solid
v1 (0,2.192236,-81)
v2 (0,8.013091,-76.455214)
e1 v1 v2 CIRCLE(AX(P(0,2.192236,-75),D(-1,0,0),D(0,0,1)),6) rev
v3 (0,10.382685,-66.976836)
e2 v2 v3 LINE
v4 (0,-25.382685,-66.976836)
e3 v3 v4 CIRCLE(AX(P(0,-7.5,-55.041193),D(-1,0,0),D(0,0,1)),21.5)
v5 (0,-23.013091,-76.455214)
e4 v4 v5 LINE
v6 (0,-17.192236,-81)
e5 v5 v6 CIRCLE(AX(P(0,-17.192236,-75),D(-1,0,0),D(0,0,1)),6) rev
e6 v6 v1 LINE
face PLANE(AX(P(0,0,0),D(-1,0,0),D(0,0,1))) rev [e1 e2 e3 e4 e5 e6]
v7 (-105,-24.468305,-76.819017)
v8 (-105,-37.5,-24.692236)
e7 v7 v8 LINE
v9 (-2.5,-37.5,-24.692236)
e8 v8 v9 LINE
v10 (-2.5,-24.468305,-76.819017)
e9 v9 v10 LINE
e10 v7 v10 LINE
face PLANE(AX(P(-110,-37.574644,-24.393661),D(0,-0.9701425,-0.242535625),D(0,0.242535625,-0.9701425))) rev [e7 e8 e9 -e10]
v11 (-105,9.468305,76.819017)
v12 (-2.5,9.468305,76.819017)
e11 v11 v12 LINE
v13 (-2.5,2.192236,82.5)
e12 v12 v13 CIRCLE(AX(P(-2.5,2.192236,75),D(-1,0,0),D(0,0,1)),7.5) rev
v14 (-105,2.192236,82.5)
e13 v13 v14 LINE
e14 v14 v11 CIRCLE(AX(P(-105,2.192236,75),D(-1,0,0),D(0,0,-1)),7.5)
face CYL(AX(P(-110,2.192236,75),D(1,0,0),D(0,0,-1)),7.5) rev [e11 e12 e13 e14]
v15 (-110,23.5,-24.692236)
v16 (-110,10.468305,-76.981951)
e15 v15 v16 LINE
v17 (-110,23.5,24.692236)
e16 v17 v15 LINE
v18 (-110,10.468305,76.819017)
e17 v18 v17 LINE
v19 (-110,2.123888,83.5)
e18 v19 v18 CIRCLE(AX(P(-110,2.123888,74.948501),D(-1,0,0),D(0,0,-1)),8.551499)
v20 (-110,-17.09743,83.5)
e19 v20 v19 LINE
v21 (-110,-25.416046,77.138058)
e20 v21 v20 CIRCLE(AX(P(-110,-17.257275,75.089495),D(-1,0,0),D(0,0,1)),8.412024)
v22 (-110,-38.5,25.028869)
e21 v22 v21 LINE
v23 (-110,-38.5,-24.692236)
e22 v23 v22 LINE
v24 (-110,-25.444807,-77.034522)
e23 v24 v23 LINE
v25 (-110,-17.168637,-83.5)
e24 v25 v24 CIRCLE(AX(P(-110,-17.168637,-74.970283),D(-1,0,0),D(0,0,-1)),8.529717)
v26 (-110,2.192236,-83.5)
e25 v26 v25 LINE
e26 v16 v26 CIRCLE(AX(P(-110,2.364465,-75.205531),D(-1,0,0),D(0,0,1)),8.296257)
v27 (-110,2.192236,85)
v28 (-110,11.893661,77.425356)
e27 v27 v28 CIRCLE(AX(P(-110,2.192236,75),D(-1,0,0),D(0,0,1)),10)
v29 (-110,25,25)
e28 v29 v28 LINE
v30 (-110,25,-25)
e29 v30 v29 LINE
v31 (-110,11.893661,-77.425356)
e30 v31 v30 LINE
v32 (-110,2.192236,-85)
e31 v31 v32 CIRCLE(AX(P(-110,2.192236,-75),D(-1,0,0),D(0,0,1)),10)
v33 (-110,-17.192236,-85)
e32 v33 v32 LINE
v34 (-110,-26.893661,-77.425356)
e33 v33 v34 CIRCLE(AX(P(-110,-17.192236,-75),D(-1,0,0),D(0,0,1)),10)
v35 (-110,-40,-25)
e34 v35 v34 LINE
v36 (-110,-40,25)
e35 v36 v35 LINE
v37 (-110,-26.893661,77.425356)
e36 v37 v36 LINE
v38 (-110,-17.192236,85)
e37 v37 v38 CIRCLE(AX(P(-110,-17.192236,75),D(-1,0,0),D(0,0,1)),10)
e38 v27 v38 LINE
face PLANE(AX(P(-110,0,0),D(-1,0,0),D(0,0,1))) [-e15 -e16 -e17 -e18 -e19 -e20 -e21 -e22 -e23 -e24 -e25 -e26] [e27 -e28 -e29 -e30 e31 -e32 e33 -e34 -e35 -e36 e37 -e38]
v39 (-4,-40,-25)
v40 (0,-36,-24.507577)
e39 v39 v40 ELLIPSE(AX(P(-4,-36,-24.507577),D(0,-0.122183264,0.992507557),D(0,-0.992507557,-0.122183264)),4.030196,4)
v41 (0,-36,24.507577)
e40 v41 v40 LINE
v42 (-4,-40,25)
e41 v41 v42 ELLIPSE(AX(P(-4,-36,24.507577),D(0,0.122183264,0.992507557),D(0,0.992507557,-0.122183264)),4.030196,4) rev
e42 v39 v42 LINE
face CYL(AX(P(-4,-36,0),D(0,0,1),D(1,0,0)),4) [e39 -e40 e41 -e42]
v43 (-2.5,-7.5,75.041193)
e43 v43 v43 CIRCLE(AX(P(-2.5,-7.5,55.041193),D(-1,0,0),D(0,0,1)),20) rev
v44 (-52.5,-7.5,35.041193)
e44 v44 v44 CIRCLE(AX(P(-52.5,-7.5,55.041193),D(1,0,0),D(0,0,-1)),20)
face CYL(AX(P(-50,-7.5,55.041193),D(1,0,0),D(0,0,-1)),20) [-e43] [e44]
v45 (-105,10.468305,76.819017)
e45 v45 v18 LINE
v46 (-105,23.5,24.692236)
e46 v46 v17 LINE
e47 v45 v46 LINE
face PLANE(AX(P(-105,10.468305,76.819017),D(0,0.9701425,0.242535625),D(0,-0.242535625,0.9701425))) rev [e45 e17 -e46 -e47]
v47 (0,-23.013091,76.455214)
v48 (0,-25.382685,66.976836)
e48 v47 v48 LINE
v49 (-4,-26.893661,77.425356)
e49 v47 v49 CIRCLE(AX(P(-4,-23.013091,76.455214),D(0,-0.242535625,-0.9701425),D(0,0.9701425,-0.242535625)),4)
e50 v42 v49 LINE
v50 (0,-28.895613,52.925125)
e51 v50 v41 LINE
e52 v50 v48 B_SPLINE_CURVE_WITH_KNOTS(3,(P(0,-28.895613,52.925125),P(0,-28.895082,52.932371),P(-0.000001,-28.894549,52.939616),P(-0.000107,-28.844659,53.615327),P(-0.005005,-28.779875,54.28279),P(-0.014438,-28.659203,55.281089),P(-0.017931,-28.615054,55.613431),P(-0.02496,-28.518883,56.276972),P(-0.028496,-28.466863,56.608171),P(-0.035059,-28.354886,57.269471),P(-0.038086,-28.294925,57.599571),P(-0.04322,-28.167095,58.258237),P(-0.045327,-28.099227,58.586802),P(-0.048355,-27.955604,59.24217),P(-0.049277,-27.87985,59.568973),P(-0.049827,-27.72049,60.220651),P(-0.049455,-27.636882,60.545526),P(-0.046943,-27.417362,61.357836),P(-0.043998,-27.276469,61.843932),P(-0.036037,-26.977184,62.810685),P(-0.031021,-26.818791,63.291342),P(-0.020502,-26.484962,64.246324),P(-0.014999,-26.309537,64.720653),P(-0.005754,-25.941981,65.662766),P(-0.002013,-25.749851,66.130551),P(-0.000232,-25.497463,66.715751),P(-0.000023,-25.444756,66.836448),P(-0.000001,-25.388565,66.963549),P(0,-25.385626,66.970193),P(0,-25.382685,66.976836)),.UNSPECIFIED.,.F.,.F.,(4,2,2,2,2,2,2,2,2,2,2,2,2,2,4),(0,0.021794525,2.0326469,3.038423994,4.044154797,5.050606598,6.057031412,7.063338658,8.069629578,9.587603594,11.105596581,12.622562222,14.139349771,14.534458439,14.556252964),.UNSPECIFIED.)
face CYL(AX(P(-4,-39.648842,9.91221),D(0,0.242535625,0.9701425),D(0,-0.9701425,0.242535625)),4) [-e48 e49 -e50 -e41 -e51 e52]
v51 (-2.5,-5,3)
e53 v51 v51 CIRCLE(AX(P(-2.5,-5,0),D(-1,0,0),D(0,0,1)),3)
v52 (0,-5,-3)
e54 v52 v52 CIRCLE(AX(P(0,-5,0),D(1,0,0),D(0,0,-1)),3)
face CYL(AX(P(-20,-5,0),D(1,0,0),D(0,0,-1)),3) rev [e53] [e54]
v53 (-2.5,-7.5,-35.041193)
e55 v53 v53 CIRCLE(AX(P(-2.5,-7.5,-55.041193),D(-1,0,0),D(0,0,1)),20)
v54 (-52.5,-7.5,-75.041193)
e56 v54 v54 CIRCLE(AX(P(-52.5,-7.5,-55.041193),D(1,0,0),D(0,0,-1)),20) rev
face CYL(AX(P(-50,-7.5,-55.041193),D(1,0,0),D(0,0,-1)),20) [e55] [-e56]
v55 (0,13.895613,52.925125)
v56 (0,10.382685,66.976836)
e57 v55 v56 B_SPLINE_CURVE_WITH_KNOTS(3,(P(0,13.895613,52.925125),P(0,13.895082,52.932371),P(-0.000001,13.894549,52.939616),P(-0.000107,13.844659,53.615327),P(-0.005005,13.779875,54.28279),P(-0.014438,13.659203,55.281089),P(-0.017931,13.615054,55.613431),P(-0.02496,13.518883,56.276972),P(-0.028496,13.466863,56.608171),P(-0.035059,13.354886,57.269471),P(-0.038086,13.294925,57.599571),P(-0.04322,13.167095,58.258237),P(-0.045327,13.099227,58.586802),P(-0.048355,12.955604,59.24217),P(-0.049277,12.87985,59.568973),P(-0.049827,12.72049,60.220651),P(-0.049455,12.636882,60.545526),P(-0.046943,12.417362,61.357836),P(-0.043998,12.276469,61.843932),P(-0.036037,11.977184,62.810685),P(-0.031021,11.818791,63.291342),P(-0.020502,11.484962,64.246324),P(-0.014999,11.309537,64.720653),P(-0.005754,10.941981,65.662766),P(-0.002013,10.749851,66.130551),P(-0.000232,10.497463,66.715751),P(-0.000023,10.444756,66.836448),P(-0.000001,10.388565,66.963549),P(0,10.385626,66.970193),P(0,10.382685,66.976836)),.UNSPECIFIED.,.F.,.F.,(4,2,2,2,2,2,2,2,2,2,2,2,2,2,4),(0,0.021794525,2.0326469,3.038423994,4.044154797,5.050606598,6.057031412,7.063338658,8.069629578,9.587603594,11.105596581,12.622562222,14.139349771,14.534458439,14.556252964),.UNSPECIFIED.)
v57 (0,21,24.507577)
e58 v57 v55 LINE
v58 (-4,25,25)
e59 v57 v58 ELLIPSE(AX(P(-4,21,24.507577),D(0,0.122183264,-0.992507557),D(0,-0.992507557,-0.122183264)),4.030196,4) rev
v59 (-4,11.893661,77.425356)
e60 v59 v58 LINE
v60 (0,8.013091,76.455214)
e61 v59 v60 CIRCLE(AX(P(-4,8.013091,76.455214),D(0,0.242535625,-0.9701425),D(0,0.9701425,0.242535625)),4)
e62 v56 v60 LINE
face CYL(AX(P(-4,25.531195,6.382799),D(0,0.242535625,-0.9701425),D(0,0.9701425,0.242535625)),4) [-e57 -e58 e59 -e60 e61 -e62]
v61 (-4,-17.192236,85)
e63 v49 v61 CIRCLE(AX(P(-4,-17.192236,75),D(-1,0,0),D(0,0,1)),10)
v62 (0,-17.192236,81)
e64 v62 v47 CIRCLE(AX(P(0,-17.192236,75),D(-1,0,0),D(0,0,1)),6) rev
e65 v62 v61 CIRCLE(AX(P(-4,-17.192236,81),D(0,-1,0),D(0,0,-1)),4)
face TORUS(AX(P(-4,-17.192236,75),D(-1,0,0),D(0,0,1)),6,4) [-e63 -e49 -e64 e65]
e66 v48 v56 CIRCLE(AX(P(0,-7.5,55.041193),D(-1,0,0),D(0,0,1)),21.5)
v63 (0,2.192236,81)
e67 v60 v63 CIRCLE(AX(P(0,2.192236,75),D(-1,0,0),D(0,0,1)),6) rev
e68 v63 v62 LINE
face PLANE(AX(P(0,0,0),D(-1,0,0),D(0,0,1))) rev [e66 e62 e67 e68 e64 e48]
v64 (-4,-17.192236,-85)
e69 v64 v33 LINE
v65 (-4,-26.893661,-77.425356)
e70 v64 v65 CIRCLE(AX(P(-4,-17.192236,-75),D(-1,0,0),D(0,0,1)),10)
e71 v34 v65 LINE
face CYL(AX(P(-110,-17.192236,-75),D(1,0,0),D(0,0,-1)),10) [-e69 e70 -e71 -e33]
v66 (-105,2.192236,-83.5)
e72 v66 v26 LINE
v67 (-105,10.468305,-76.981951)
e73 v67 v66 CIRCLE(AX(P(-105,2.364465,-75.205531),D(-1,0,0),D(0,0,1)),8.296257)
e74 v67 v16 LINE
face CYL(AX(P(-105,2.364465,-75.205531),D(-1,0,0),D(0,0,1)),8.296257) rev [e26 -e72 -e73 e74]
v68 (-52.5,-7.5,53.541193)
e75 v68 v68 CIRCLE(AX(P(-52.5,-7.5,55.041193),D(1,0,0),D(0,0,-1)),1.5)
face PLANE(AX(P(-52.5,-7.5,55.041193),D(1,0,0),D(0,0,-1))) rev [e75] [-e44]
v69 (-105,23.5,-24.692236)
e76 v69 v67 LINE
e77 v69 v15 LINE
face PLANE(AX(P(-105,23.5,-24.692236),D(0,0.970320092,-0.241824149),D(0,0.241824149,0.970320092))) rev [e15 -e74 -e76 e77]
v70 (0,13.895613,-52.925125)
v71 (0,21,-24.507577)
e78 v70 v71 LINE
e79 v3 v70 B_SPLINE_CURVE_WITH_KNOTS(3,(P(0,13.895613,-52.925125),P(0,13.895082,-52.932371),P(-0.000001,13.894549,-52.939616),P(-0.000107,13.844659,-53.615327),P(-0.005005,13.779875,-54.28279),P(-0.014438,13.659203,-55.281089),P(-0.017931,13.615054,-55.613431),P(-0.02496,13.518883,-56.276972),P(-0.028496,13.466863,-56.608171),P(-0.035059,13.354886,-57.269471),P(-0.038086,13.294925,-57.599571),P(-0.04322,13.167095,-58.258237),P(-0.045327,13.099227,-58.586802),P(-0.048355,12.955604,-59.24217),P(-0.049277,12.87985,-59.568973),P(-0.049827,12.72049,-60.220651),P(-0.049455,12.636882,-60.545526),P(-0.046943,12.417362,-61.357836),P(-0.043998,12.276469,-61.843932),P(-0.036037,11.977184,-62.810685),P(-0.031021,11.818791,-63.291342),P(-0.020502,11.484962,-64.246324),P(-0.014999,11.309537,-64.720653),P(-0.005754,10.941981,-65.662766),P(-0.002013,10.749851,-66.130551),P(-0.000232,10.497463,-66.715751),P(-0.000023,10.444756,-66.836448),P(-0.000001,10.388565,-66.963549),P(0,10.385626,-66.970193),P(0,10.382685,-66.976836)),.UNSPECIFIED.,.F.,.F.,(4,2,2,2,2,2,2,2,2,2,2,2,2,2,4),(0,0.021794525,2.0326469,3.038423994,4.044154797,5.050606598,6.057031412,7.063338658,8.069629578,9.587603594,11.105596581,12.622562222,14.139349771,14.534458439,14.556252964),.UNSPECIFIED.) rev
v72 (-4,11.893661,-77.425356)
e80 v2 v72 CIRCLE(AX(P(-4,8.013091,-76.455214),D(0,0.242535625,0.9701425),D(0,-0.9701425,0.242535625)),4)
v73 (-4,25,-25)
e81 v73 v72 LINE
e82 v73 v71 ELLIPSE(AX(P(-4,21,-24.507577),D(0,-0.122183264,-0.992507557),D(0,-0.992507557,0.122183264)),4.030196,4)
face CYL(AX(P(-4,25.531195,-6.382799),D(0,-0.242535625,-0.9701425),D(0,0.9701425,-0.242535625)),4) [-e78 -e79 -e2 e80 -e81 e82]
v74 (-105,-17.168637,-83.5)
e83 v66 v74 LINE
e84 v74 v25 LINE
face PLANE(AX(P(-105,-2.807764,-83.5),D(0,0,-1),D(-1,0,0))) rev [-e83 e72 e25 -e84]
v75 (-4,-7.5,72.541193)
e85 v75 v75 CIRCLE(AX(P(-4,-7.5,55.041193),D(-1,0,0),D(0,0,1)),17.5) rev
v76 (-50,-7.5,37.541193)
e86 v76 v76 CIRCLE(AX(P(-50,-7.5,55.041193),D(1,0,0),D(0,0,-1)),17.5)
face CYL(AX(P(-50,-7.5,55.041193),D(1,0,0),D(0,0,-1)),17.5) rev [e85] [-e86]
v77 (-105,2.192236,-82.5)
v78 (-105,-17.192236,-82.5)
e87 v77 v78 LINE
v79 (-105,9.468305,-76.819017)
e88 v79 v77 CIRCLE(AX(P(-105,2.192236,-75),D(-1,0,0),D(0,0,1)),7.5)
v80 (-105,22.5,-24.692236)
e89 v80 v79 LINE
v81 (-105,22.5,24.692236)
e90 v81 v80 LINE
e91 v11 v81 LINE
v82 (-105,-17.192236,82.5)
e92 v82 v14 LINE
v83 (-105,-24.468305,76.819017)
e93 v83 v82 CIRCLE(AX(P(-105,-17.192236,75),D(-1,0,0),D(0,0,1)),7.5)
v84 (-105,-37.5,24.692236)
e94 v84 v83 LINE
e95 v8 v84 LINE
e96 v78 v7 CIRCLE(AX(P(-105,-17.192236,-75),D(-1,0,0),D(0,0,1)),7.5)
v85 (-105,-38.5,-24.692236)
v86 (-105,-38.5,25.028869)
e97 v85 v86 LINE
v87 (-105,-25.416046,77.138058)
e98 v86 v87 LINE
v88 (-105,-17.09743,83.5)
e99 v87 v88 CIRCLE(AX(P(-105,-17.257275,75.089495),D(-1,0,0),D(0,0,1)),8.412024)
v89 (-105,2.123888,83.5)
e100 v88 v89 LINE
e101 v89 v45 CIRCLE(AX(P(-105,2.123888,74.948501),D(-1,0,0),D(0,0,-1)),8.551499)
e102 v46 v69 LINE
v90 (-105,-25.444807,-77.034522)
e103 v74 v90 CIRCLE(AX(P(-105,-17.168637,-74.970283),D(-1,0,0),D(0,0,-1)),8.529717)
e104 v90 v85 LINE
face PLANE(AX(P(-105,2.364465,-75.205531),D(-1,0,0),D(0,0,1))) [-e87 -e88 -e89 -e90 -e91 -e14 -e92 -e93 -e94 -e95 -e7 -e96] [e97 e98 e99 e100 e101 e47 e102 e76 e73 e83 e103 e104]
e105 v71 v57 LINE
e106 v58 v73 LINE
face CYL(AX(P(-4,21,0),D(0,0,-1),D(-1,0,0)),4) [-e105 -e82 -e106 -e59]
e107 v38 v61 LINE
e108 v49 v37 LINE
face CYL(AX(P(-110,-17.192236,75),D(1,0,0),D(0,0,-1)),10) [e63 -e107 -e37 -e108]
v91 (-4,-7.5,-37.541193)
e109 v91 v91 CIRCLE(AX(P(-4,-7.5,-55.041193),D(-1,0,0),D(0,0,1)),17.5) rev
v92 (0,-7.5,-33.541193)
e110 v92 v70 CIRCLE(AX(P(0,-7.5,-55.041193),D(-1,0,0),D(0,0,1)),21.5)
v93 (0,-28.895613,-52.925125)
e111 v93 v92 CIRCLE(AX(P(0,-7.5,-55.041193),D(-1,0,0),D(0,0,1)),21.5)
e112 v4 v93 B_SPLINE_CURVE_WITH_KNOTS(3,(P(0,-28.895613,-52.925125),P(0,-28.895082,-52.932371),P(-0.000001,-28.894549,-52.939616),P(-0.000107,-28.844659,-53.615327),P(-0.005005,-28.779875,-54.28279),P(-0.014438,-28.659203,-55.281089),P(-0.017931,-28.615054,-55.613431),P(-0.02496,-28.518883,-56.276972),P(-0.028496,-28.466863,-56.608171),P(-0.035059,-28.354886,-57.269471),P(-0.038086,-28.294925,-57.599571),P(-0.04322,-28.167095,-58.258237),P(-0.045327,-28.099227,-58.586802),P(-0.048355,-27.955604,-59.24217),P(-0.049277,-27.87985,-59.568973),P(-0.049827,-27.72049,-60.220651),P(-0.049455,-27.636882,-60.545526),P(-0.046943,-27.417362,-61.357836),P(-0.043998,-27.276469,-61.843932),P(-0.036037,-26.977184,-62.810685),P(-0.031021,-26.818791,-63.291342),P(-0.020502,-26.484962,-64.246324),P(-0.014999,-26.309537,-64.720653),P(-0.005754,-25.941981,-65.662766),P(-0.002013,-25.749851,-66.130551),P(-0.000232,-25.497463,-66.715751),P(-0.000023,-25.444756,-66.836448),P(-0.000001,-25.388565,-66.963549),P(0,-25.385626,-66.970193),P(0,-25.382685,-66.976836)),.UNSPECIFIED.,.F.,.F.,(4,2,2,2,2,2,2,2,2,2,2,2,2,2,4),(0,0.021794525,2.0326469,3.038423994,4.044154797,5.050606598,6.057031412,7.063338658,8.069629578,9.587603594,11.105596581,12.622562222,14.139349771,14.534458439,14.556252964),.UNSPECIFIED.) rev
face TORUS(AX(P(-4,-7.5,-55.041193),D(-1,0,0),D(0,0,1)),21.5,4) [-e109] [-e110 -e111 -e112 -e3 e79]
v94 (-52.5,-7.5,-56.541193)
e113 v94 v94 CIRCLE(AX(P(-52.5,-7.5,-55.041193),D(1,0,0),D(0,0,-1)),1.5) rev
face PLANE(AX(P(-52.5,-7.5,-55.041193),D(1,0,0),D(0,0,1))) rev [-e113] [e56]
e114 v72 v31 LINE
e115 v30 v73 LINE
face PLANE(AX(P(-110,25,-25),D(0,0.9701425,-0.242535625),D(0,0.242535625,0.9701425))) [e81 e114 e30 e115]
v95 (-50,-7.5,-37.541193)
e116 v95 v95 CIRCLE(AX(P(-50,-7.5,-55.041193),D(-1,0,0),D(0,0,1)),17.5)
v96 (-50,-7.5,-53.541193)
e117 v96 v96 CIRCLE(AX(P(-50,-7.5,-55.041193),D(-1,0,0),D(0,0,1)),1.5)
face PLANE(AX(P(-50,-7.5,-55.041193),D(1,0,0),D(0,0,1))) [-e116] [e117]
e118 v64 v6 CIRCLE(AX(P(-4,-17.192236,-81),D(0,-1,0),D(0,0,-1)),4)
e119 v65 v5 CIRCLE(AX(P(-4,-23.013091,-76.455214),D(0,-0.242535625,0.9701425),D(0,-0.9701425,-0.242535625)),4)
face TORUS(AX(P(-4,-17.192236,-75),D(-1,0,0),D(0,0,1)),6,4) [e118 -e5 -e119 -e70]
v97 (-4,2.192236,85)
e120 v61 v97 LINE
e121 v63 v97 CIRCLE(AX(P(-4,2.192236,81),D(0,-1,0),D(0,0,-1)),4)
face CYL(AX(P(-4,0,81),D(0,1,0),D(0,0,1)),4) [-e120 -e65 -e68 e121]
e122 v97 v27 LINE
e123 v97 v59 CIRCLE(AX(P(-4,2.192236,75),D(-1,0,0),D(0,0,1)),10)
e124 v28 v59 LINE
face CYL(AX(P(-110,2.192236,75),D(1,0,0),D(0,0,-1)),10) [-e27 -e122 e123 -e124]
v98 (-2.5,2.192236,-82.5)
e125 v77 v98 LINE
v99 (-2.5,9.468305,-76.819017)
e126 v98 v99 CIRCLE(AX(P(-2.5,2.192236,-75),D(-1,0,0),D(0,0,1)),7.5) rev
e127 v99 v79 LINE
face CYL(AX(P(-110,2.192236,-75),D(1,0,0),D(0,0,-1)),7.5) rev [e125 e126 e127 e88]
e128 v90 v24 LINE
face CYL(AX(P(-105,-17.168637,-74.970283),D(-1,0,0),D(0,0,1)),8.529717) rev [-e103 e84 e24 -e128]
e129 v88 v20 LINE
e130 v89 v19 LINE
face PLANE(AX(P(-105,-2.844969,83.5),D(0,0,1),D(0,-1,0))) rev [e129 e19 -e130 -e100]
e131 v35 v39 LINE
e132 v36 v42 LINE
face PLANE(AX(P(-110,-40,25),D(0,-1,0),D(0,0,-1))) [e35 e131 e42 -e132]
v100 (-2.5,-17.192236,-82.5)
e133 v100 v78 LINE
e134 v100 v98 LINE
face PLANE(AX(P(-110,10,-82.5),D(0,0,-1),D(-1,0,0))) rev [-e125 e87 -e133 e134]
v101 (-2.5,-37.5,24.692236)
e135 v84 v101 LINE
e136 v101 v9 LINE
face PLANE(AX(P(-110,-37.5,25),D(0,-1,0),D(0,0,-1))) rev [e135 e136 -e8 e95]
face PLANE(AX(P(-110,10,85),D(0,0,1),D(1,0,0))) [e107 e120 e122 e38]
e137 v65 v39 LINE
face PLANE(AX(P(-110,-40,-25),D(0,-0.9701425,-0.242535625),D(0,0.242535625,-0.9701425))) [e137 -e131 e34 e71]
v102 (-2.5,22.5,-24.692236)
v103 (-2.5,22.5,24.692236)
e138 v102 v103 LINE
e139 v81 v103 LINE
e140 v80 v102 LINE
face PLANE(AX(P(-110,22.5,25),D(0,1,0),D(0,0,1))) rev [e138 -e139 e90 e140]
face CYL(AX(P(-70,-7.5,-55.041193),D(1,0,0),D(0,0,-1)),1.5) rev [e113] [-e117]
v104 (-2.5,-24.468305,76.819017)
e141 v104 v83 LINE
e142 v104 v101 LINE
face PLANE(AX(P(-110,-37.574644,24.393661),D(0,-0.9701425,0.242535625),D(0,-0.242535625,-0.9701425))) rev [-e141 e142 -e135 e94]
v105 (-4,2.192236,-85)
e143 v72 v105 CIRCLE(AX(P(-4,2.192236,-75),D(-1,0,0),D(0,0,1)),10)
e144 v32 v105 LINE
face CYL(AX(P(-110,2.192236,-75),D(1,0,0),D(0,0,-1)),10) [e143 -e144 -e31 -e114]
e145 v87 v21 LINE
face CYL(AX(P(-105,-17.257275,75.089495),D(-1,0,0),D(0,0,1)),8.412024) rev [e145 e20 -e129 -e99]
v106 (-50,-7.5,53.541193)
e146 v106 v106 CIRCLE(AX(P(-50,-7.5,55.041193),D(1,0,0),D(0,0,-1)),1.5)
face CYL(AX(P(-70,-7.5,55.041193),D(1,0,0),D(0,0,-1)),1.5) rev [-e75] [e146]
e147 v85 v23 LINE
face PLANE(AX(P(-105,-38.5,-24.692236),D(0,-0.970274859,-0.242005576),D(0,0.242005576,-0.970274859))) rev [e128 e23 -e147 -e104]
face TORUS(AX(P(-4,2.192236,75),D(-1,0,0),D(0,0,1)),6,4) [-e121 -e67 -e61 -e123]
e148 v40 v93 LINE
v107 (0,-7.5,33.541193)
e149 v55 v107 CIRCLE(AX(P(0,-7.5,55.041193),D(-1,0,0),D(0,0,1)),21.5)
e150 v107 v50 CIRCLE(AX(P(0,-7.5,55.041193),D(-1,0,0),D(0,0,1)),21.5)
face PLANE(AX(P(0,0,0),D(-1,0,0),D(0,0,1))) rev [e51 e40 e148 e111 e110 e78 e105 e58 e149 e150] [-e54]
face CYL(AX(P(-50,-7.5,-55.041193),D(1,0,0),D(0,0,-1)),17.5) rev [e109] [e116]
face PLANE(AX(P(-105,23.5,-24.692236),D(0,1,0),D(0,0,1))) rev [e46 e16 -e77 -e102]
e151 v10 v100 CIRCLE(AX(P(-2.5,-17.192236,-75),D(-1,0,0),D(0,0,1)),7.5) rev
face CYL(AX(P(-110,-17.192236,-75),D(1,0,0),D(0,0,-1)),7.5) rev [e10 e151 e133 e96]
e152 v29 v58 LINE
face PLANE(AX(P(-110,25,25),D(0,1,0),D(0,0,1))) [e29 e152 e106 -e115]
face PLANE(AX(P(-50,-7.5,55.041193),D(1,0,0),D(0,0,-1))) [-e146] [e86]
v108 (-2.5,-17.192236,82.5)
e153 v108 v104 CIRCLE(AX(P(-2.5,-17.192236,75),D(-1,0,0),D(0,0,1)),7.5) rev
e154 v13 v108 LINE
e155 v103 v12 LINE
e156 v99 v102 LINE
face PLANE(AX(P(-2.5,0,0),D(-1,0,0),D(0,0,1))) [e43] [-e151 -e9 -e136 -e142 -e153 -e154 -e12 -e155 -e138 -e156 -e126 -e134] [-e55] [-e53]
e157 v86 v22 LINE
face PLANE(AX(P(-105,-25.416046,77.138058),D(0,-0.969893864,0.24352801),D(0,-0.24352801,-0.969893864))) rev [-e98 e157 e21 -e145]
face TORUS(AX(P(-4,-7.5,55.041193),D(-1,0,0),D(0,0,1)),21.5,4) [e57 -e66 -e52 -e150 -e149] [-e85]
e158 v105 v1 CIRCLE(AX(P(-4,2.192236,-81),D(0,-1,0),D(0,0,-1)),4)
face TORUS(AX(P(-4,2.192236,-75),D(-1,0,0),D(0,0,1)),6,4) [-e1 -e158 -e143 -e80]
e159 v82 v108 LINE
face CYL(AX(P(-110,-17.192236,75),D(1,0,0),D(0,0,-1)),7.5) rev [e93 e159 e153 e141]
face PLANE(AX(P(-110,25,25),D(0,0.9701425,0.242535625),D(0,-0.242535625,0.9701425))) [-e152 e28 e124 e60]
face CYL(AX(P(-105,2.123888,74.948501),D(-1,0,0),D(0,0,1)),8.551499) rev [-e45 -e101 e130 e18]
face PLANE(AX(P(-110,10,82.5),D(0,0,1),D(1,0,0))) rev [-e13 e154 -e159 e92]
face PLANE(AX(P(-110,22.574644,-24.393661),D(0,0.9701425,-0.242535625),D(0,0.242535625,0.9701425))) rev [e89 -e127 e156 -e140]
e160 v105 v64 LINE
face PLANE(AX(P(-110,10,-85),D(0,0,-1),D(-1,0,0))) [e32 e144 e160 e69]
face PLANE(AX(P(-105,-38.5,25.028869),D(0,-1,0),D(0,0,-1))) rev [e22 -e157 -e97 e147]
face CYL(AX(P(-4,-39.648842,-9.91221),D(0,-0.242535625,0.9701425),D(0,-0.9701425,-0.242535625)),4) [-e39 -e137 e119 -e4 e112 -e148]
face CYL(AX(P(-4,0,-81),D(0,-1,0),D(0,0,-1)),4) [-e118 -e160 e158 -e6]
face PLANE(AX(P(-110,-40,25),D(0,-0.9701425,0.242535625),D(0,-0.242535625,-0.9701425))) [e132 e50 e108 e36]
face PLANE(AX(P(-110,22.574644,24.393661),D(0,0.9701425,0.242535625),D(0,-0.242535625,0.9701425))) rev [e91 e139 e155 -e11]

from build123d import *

# Parameters (mm, degrees)
BOSS_EXTRUDE1_DEPTH = 110
SKETCH2_R           = 17.5
CUT_EXTRUDE1_DEPTH  = 50
FILLET1_R           = 10
SHELL1_T            = -2.5
CUT_EXTRUDE4_DEPTH  = 5
FILLET2_R           = 4
SKETCH5_R           = 3
CUT_EXTRUDE5_DEPTH  = 20
SKETCH6_R           = 1.5
CUT_EXTRUDE6_DEPTH  = 20


with BuildPart() as part:
    # Sketch1 → Boss-Extrude1 (new body)
    with BuildSketch(Plane(origin=(0, 0, 0), x_dir=(0, 0, -1), z_dir=(1, 0, 0))):
        Polygon((-25, 25), (-85, 10), (-85, -25), (-25, -40), (25, -40), (85, -25), (85, 10), (25, 25), align=None)
    extrude(amount=-BOSS_EXTRUDE1_DEPTH)

    # Sketch2 → Cut-Extrude1 (cut)
    with BuildSketch(Plane(origin=(0, 0, 0), x_dir=(0, 0, -1), z_dir=(1, 0, 0))):
        with Locations((-55.041193262, -7.5)):
            Circle(SKETCH2_R)
    cut_extrude1 = extrude(amount=-CUT_EXTRUDE1_DEPTH, mode=Mode.SUBTRACT)

    # Fillet1
    fillet1_edges = [part.edges().sort_by_distance(p)[0] for p in [
        (-55, 10, -85),
        (-55, -25, -85),
        (-55, -25, 85),
        (-55, 10, 85),
    ]]
    fillet(fillet1_edges, radius=FILLET1_R)

    # Mirror1: Cut-Extrude1 across plane
    add(cut_extrude1.mirror(Plane.XY), mode=Mode.SUBTRACT)

    # Shell1
    shell1_openings = [part.faces().sort_by_distance(p)[0] for p in [
        (-110, -7.5, 0),
    ]]
    offset(amount=SHELL1_T, openings=shell1_openings, kind=Kind.INTERSECTION)

    # Sketch4 → Cut-Extrude4 (cut)
    with BuildSketch(Plane.ZY.offset(110)):
        with BuildLine():
            Line((-24.692235936, 23.5), (24.692235936, 23.5))
            Line((24.692235936, 23.5), (76.819017188, 10.468304687))
            ThreePointArc((76.819017188, 10.468304687), (81.623972971, 7.468623928), (83.5, 2.123887516))
            Line((83.5, 2.123887516), (83.5, -2.844969352))
            Line((83.5, -2.844969352), (83.5, -17.097430261))
            ThreePointArc((83.5, -17.097430261), (81.771400928, -22.367488253), (77.138058264, -25.416045575))
            Line((77.138058264, -25.416045575), (25.028869166, -38.5))
            Line((25.028869166, -38.5), (-24.692235936, -38.5))
            Line((-24.692235936, -38.5), (-77.034521995, -25.444807466))
            ThreePointArc((-77.034521995, -25.444807466), (-81.692018142, -22.419765778), (-83.5, -17.168637406))
            Line((-83.5, -17.168637406), (-83.5, -2.807764064))
            Line((-83.5, -2.807764064), (-83.5, 2.192235936))
            ThreePointArc((-83.5, 2.192235936), (-81.723124679, 7.497578438), (-76.981950719, 10.468304687))
            Line((-76.981950719, 10.468304687), (-24.692235936, 23.5))
        make_face()
        with BuildLine():
            Line((-24.692235936, 22.5), (24.692235936, 22.5))
            Line((24.692235936, 22.5), (76.819017188, 9.468304687))
            ThreePointArc((76.819017188, 9.468304687), (80.911540785, 6.807827506), (82.5, 2.192235936))
            Line((82.5, 2.192235936), (82.5, -17.192235936))
            ThreePointArc((82.5, -17.192235936), (80.911540785, -21.807827506), (76.819017188, -24.468304687))
            Line((76.819017188, -24.468304687), (24.692235936, -37.5))
            Line((24.692235936, -37.5), (-24.692235936, -37.5))
            Line((-24.692235936, -37.5), (-76.819017188, -24.468304687))
            ThreePointArc((-76.819017188, -24.468304687), (-80.911540785, -21.807827506), (-82.5, -17.192235936))
            Line((-82.5, -17.192235936), (-82.5, 2.192235936))
            ThreePointArc((-82.5, 2.192235936), (-80.911540785, 6.807827506), (-76.819017188, 9.468304687))
            Line((-76.819017188, 9.468304687), (-24.692235936, 22.5))
        make_face(mode=Mode.SUBTRACT)
    extrude(amount=-CUT_EXTRUDE4_DEPTH, mode=Mode.SUBTRACT)

    # Fillet2
    # the kernel refuses this fillet: 4 mm, written as the material it takes off along each edge
    with BuildSketch(Plane(origin=(0, 27.42535625, 15.298574999), x_dir=(-1, 0, 0), z_dir=(0, -0.2425356250363329, 0.970142500145332))) as fillet2_piece_1:
        with BuildLine():
            CenterArc((FILLET2_R, FILLET2_R), FILLET2_R, 180, 90)
            Line((0, FILLET2_R), (0, 0))
            Line((0, 0), (FILLET2_R, 0))
        make_face()
    extrude(amount=64.03882032, mode=Mode.SUBTRACT)
    with BuildSketch(Plane(origin=(0, 25, -35), x_dir=(0, -1, 0), z_dir=(0, 0, 1)), Plane(origin=(0, -40, 35), x_dir=(0, 1, 0), z_dir=(0, 0, -1))) as fillet2_piece_2:
        with BuildLine():
            CenterArc((FILLET2_R, -FILLET2_R), FILLET2_R, 90, 90)
            Line((0, -FILLET2_R), (0, 0))
            Line((0, 0), (FILLET2_R, 0))
        make_face()
    extrude(amount=70, mode=Mode.SUBTRACT)
    with BuildSketch(Plane(origin=(0, -7.5, 55.041193262), x_dir=(0, 0, -1), z_dir=(0, -1, 0))) as fillet2_piece_3:
        with BuildLine():
            CenterArc((17.5 + FILLET2_R, -FILLET2_R), FILLET2_R, 90, 90)
            Line((17.5, -FILLET2_R), (17.5, 0))
            Line((17.5, 0), (17.5 + FILLET2_R, 0))
        make_face()
    revolve(axis=Axis((0, -7.5, 55.041193262), (1, 0, 0)), mode=Mode.SUBTRACT)
    with BuildSketch(Plane(origin=(0, 2.192235936, 85), x_dir=(0, 0, -1), z_dir=(0, -1, 0)), Plane(origin=(0, -17.192235936, -85), x_dir=(0, 0, 1), z_dir=(0, 1, 0))) as fillet2_piece_4:
        with BuildLine():
            CenterArc((FILLET2_R, -FILLET2_R), FILLET2_R, 90, 90)
            Line((0, -FILLET2_R), (0, 0))
            Line((0, 0), (FILLET2_R, 0))
        make_face()
    extrude(amount=19.384471872, mode=Mode.SUBTRACT)
    with BuildSketch(Plane(origin=(0, -26.893660937, 77.42535625), x_dir=(0, 0.970142500145332, -0.24253562503633308), z_dir=(0, -0.24253562503633302, -0.9701425001453319)), Plane(origin=(0, 11.893660937, -77.42535625), x_dir=(0, -0.9701425001453319, 0.24253562503633322), z_dir=(0, 0.24253562503633322, 0.9701425001453319)), Plane(origin=(0, -42.42535625, -15.298574999), x_dir=(0, 0.9701425001453319, 0.2425356250363329), z_dir=(0, 0.24253562503633294, -0.970142500145332))) as fillet2_piece_5:
        with BuildLine():
            CenterArc((FILLET2_R, -FILLET2_R), FILLET2_R, 90, 90)
            Line((0, -FILLET2_R), (0, 0))
            Line((0, 0), (FILLET2_R, 0))
        make_face()
    extrude(amount=64.03882032, mode=Mode.SUBTRACT)
    with BuildSketch(Plane(origin=(0, 2.192235936, 75), x_dir=(0, 0.970142500145332, 0.2425356250363322), z_dir=(0, 0.2425356250363322, -0.970142500145332))) as fillet2_piece_6:
        with BuildLine():
            CenterArc((10 - FILLET2_R, -FILLET2_R), FILLET2_R, 0, 90)
            Line((10, -FILLET2_R), (10, 0))
            Line((10, 0), (10 - FILLET2_R, 0))
        make_face()
    revolve(axis=Axis((0, 2.192235936, 75), (1, 0, 0)), revolution_arc=75.963756532, mode=Mode.SUBTRACT)
    with BuildSketch(Plane(origin=(0, -17.192235936, 75), x_dir=(0, 0, 1), z_dir=(0, 1, 0))) as fillet2_piece_7:
        with BuildLine():
            CenterArc((10 - FILLET2_R, -FILLET2_R), FILLET2_R, 0, 90)
            Line((10, -FILLET2_R), (10, 0))
            Line((10, 0), (10 - FILLET2_R, 0))
        make_face()
    revolve(axis=Axis((0, -17.192235936, 75), (1, 0, 0)), revolution_arc=75.963756532, mode=Mode.SUBTRACT)
    with BuildSketch(Plane(origin=(0, 2.192235936, -75), x_dir=(0, 0.9701425001453317, -0.2425356250363336), z_dir=(0, 0.2425356250363336, 0.9701425001453317))) as fillet2_piece_8:
        with BuildLine():
            CenterArc((10 - FILLET2_R, FILLET2_R), FILLET2_R, 270, 90)
            Line((10, FILLET2_R), (10, 0))
            Line((10, 0), (10 - FILLET2_R, 0))
        make_face()
    revolve(axis=Axis((0, 2.192235936, -75), (-1, 0, 0)), revolution_arc=75.963756532, mode=Mode.SUBTRACT)
    with BuildSketch(Plane(origin=(0, -17.192235936, -75), x_dir=(0, 0, -1), z_dir=(0, 1, 0))) as fillet2_piece_9:
        with BuildLine():
            CenterArc((10 - FILLET2_R, FILLET2_R), FILLET2_R, 270, 90)
            Line((10, FILLET2_R), (10, 0))
            Line((10, 0), (10 - FILLET2_R, 0))
        make_face()
    revolve(axis=Axis((0, -17.192235936, -75), (-1, 0, 0)), revolution_arc=75.963756532, mode=Mode.SUBTRACT)
    with BuildSketch(Plane(origin=(0, -7.5, -55.041193262), x_dir=(0, 0, 1), z_dir=(0, -1, 0))) as fillet2_piece_10:
        with BuildLine():
            CenterArc((17.5 + FILLET2_R, FILLET2_R), FILLET2_R, 180, 90)
            Line((17.5, FILLET2_R), (17.5, 0))
            Line((17.5, 0), (17.5 + FILLET2_R, 0))
        make_face()
    revolve(axis=Axis((0, -7.5, -55.041193262), (-1, 0, 0)), mode=Mode.SUBTRACT)

    # Sketch5 → Cut-Extrude5 (cut)
    with BuildSketch(Plane(origin=(0, 0, 0), x_dir=(0, 0, -1), z_dir=(1, 0, 0))):
        with Locations((0, -5)):
            Circle(SKETCH5_R)
    extrude(amount=-CUT_EXTRUDE5_DEPTH, mode=Mode.SUBTRACT)

    # Sketch6 → Cut-Extrude6 (cut)
    with BuildSketch(Plane(origin=(-50, 0, 0), x_dir=(0, 0, -1), z_dir=(1, 0, 0))):
        with Locations((-55.041193262, -7.5)):
            Circle(SKETCH6_R)
    cut_extrude6 = extrude(amount=-CUT_EXTRUDE6_DEPTH, mode=Mode.SUBTRACT)

    # Mirror3: Cut-Extrude6 across plane
    add(cut_extrude6.mirror(Plane.XY), mode=Mode.SUBTRACT)


solid = part.part
